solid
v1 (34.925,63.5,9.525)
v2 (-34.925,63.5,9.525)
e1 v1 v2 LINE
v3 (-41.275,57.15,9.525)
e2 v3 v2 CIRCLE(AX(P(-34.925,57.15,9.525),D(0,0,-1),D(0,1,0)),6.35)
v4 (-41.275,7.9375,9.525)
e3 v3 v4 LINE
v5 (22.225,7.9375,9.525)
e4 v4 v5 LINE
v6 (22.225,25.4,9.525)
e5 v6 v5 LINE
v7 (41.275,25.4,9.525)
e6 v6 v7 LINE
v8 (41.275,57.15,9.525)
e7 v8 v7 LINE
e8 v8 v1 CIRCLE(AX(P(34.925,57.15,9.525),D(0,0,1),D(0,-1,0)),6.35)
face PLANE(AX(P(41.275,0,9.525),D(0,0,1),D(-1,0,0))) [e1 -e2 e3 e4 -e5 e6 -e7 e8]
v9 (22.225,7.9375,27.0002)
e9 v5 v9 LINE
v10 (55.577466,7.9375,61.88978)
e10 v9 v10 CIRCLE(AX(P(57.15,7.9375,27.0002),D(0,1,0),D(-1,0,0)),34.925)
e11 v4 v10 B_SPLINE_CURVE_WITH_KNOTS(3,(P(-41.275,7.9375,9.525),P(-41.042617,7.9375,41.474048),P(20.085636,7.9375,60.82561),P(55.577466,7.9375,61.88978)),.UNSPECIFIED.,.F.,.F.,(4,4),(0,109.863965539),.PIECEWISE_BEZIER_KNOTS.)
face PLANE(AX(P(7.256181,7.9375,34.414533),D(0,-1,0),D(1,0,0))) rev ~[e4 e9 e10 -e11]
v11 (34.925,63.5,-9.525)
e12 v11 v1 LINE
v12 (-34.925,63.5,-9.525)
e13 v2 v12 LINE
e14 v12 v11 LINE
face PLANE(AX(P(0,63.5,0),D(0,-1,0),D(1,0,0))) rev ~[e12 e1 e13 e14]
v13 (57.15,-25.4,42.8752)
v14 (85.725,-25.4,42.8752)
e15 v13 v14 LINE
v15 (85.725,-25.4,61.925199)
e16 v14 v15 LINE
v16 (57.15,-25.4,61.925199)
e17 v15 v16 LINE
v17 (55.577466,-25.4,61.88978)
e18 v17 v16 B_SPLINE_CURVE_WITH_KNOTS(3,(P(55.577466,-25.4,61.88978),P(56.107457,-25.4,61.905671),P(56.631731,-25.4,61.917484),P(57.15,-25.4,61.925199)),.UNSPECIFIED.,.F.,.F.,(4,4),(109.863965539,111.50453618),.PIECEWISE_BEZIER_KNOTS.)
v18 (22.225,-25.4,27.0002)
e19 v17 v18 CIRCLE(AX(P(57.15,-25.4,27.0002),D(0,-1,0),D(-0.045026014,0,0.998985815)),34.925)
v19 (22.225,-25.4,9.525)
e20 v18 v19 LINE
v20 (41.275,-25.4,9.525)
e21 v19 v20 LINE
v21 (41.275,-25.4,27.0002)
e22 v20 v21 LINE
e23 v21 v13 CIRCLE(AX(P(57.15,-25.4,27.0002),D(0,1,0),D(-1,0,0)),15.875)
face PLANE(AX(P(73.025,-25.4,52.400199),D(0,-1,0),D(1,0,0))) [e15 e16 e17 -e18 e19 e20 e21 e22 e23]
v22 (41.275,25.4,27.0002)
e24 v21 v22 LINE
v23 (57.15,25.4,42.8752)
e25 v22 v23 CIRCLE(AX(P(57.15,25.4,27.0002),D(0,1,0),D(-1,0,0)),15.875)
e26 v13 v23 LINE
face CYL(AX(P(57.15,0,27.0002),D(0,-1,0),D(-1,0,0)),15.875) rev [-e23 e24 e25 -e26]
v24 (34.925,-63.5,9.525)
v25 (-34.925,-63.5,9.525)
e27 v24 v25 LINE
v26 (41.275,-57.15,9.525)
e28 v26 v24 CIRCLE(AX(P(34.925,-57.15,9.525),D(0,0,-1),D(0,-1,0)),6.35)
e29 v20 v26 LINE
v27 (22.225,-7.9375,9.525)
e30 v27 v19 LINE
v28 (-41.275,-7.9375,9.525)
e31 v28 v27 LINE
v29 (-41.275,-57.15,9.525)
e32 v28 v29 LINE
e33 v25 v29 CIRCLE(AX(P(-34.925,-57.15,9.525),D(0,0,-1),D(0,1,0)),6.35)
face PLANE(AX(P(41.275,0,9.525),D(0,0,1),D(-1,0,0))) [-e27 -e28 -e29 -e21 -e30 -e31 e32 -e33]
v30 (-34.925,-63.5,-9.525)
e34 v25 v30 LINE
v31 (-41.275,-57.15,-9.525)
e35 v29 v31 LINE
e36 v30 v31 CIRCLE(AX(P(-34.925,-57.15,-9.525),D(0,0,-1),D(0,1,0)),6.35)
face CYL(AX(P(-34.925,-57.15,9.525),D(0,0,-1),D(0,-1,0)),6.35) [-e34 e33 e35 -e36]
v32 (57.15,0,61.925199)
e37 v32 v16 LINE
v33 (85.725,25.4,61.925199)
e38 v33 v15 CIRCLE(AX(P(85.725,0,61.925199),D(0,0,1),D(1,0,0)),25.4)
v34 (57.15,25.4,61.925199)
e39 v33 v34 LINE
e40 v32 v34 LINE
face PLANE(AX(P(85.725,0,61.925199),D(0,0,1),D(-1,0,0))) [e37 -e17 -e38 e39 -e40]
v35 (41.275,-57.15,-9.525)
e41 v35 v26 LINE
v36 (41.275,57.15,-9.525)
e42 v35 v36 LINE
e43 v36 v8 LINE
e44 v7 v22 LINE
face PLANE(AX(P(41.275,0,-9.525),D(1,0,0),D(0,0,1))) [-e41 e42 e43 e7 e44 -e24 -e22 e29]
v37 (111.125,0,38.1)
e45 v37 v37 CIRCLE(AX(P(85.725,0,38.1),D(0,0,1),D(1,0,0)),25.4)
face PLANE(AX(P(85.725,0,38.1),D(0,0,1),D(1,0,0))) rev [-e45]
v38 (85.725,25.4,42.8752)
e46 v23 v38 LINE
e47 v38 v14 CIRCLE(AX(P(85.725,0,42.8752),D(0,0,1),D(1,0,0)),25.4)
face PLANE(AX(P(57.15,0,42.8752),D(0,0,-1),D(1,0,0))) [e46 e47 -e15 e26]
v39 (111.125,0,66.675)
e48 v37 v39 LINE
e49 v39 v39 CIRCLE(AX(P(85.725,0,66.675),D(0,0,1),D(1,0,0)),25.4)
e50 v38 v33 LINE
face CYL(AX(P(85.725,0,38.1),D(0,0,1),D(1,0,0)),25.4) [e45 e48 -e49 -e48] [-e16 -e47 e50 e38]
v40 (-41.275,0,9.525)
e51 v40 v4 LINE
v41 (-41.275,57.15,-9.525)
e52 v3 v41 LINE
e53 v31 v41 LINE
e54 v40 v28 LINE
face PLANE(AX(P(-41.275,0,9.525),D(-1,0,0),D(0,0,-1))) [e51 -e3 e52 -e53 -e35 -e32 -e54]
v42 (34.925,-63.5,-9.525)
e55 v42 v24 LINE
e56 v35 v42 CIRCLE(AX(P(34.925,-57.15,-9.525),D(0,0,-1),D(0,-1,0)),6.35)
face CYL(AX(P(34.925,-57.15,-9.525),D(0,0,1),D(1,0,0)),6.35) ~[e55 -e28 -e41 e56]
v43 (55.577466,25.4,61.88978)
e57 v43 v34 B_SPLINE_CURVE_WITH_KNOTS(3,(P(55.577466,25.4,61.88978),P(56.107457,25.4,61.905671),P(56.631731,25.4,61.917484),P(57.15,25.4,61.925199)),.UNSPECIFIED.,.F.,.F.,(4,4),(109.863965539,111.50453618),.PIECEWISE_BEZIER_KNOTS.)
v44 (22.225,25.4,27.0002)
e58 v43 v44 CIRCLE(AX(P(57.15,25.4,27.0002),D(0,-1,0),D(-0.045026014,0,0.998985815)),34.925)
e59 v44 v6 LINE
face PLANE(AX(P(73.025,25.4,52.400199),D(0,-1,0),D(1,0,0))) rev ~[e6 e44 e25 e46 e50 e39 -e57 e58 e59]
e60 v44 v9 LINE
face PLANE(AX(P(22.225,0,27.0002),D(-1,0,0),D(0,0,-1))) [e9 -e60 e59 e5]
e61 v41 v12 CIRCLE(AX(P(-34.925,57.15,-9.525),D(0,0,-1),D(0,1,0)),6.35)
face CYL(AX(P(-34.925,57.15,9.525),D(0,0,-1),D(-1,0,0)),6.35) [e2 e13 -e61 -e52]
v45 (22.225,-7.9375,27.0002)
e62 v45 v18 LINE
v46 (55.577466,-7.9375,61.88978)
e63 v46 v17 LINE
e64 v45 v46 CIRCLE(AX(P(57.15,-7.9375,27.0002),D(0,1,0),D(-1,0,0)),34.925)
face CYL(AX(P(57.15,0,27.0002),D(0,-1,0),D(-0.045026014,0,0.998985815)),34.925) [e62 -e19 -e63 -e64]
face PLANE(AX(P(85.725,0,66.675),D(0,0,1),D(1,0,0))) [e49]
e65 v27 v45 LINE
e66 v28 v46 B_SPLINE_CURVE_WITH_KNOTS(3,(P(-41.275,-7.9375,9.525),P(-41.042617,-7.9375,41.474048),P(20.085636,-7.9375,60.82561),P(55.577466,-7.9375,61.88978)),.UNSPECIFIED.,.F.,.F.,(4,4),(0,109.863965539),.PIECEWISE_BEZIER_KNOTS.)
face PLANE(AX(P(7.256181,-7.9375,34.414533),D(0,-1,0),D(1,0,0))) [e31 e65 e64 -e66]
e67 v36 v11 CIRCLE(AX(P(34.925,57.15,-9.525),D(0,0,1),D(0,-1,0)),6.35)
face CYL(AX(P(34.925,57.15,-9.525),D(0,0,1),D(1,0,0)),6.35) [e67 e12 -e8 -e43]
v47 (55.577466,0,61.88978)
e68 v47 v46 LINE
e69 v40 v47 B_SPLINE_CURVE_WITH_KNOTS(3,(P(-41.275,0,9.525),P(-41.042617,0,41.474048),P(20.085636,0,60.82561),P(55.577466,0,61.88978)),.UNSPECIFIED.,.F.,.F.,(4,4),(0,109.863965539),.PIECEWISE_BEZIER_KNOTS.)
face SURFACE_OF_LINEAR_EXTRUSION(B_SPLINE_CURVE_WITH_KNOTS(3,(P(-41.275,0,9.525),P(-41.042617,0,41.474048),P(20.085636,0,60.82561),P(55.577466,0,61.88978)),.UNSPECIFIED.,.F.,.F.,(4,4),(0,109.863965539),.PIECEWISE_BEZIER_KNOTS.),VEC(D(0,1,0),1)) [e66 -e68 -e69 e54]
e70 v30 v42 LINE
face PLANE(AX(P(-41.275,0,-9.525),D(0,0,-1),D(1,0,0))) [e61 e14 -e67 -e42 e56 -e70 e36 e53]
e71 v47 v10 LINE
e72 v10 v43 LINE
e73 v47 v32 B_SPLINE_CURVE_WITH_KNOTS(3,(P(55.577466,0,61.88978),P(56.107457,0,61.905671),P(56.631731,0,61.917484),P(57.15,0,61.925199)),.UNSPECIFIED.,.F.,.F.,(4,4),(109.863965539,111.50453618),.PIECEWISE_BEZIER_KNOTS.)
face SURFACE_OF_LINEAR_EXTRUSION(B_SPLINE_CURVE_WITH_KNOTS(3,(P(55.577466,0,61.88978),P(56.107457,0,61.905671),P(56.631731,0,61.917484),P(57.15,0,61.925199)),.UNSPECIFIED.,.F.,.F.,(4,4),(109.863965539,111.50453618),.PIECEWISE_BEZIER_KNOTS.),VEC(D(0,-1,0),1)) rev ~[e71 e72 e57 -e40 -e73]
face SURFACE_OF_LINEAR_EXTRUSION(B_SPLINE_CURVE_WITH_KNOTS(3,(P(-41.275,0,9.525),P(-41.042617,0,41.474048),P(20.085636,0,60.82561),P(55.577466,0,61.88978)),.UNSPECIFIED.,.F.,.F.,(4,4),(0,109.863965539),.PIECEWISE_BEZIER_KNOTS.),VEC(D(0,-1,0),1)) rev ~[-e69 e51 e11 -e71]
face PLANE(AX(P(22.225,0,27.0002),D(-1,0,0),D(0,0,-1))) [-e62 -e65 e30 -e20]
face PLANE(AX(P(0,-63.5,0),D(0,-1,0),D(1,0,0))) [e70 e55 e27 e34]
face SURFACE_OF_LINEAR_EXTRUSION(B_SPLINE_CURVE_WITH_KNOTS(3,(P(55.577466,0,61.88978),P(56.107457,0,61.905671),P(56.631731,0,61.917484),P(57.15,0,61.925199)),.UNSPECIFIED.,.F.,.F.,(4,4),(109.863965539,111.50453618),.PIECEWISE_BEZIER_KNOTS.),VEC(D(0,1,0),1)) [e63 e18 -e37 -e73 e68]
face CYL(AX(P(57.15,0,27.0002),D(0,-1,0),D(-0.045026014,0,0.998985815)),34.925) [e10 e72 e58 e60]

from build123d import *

# Parameters (mm, degrees)
F1_DEPTH = 63.5
F0_W     = 25.4
F0_H     = 19.0499988828
F2_DEPTH = 25.4
F3_DEPTH = 7.9375
F5_R     = 6.35


# Not quite as in the source:
# - ends of sketch curves that miss each other by under 0.0002 mm in the source are joined


with BuildPart() as f1:
    # F0 (on Front) → F1 (new body, symmetric)
    with BuildSketch(Plane.XZ):
        Polygon((41.275, -9.525), (41.275, 9.525), (22.2249999642, 9.525), (-41.275, 9.525), (-41.275, -9.525), align=None)
    extrude(amount=F1_DEPTH, both=True)

    # F0 (on Front) → F2 (join, symmetric)
    with BuildSketch(Plane.XZ):
        with Locations((73.025, 52.4001994414)):
            Rectangle(F0_W, F0_H)
        with BuildLine():
            Line((22.2249999642, 9.525), (41.275, 9.525))
            Line((41.275, 9.525), (41.275, 27.0002))
            ThreePointArc((41.275, 27.0002), (45.9246798487, 38.2255201513), (57.15, 42.8752))
            Line((57.15, 42.8752), (60.325, 42.8752))
            Line((60.325, 42.8752), (60.325, 61.9251988828))
            Line((60.325, 61.9251988828), (57.15, 61.9251988828))
            add(Edge.make_bspline(
                [(55.577466475, 61.8897796164), (56.107456948, 61.9056705872), (56.6317308349, 61.9174837091), (57.15, 61.9251988828)],
                knots=[109.8639655387, 109.8639655387, 109.8639655387, 109.8639655387, 111.5045361803, 111.5045361803, 111.5045361803, 111.5045361803], degree=3))
            ThreePointArc((55.577466475, 61.8897796164), (31.9044423619, 51.133526481), (22.2249999642, 27.0002))
            Line((22.2249999642, 27.0002), (22.2249999642, 9.525))
        make_face()
    extrude(amount=F2_DEPTH, both=True)

    # F0 (on Front) → F3 (join, symmetric)
    with BuildSketch(Plane.XZ):
        with BuildLine():
            Line((-41.275, 9.525), (22.2249999642, 9.525))
            Line((22.2249999642, 9.525), (22.2249999642, 27.0002))
            ThreePointArc((22.2249999642, 27.0002), (31.9044423619, 51.133526481), (55.577466475, 61.8897796164))
            add(Edge.make_bspline(
                [(-41.275, 9.525), (-41.042616605, 41.4740477998), (20.0856360221, 60.8256102231), (55.577466475, 61.8897796164)],
                knots=[0, 0, 0, 0, 109.8639655387, 109.8639655387, 109.8639655387, 109.8639655387], degree=3))
        make_face()
    extrude(amount=F3_DEPTH, both=True)

    # F0 (on Front) → F4 (revolve)
    with BuildSketch(Plane.XZ):
        Polygon((85.725, 61.9251988828), (85.725, 42.8752), (85.725, 38.1), (111.125, 38.1), (111.125, 66.675), (85.725, 66.675), align=None)
    revolve(axis=Axis((85.725, 0, 52.3875), (0, 0, 1)))

    # F5
    f5_edges = [f1.edges().sort_by_distance(p)[0] for p in [
        (41.275, -63.5, 0),
        (41.275, 63.5, 0),
        (-41.275, -63.5, 0),
        (-41.275, 63.5, 0),
    ]]
    fillet(f5_edges, radius=F5_R)


solid = f1.part
